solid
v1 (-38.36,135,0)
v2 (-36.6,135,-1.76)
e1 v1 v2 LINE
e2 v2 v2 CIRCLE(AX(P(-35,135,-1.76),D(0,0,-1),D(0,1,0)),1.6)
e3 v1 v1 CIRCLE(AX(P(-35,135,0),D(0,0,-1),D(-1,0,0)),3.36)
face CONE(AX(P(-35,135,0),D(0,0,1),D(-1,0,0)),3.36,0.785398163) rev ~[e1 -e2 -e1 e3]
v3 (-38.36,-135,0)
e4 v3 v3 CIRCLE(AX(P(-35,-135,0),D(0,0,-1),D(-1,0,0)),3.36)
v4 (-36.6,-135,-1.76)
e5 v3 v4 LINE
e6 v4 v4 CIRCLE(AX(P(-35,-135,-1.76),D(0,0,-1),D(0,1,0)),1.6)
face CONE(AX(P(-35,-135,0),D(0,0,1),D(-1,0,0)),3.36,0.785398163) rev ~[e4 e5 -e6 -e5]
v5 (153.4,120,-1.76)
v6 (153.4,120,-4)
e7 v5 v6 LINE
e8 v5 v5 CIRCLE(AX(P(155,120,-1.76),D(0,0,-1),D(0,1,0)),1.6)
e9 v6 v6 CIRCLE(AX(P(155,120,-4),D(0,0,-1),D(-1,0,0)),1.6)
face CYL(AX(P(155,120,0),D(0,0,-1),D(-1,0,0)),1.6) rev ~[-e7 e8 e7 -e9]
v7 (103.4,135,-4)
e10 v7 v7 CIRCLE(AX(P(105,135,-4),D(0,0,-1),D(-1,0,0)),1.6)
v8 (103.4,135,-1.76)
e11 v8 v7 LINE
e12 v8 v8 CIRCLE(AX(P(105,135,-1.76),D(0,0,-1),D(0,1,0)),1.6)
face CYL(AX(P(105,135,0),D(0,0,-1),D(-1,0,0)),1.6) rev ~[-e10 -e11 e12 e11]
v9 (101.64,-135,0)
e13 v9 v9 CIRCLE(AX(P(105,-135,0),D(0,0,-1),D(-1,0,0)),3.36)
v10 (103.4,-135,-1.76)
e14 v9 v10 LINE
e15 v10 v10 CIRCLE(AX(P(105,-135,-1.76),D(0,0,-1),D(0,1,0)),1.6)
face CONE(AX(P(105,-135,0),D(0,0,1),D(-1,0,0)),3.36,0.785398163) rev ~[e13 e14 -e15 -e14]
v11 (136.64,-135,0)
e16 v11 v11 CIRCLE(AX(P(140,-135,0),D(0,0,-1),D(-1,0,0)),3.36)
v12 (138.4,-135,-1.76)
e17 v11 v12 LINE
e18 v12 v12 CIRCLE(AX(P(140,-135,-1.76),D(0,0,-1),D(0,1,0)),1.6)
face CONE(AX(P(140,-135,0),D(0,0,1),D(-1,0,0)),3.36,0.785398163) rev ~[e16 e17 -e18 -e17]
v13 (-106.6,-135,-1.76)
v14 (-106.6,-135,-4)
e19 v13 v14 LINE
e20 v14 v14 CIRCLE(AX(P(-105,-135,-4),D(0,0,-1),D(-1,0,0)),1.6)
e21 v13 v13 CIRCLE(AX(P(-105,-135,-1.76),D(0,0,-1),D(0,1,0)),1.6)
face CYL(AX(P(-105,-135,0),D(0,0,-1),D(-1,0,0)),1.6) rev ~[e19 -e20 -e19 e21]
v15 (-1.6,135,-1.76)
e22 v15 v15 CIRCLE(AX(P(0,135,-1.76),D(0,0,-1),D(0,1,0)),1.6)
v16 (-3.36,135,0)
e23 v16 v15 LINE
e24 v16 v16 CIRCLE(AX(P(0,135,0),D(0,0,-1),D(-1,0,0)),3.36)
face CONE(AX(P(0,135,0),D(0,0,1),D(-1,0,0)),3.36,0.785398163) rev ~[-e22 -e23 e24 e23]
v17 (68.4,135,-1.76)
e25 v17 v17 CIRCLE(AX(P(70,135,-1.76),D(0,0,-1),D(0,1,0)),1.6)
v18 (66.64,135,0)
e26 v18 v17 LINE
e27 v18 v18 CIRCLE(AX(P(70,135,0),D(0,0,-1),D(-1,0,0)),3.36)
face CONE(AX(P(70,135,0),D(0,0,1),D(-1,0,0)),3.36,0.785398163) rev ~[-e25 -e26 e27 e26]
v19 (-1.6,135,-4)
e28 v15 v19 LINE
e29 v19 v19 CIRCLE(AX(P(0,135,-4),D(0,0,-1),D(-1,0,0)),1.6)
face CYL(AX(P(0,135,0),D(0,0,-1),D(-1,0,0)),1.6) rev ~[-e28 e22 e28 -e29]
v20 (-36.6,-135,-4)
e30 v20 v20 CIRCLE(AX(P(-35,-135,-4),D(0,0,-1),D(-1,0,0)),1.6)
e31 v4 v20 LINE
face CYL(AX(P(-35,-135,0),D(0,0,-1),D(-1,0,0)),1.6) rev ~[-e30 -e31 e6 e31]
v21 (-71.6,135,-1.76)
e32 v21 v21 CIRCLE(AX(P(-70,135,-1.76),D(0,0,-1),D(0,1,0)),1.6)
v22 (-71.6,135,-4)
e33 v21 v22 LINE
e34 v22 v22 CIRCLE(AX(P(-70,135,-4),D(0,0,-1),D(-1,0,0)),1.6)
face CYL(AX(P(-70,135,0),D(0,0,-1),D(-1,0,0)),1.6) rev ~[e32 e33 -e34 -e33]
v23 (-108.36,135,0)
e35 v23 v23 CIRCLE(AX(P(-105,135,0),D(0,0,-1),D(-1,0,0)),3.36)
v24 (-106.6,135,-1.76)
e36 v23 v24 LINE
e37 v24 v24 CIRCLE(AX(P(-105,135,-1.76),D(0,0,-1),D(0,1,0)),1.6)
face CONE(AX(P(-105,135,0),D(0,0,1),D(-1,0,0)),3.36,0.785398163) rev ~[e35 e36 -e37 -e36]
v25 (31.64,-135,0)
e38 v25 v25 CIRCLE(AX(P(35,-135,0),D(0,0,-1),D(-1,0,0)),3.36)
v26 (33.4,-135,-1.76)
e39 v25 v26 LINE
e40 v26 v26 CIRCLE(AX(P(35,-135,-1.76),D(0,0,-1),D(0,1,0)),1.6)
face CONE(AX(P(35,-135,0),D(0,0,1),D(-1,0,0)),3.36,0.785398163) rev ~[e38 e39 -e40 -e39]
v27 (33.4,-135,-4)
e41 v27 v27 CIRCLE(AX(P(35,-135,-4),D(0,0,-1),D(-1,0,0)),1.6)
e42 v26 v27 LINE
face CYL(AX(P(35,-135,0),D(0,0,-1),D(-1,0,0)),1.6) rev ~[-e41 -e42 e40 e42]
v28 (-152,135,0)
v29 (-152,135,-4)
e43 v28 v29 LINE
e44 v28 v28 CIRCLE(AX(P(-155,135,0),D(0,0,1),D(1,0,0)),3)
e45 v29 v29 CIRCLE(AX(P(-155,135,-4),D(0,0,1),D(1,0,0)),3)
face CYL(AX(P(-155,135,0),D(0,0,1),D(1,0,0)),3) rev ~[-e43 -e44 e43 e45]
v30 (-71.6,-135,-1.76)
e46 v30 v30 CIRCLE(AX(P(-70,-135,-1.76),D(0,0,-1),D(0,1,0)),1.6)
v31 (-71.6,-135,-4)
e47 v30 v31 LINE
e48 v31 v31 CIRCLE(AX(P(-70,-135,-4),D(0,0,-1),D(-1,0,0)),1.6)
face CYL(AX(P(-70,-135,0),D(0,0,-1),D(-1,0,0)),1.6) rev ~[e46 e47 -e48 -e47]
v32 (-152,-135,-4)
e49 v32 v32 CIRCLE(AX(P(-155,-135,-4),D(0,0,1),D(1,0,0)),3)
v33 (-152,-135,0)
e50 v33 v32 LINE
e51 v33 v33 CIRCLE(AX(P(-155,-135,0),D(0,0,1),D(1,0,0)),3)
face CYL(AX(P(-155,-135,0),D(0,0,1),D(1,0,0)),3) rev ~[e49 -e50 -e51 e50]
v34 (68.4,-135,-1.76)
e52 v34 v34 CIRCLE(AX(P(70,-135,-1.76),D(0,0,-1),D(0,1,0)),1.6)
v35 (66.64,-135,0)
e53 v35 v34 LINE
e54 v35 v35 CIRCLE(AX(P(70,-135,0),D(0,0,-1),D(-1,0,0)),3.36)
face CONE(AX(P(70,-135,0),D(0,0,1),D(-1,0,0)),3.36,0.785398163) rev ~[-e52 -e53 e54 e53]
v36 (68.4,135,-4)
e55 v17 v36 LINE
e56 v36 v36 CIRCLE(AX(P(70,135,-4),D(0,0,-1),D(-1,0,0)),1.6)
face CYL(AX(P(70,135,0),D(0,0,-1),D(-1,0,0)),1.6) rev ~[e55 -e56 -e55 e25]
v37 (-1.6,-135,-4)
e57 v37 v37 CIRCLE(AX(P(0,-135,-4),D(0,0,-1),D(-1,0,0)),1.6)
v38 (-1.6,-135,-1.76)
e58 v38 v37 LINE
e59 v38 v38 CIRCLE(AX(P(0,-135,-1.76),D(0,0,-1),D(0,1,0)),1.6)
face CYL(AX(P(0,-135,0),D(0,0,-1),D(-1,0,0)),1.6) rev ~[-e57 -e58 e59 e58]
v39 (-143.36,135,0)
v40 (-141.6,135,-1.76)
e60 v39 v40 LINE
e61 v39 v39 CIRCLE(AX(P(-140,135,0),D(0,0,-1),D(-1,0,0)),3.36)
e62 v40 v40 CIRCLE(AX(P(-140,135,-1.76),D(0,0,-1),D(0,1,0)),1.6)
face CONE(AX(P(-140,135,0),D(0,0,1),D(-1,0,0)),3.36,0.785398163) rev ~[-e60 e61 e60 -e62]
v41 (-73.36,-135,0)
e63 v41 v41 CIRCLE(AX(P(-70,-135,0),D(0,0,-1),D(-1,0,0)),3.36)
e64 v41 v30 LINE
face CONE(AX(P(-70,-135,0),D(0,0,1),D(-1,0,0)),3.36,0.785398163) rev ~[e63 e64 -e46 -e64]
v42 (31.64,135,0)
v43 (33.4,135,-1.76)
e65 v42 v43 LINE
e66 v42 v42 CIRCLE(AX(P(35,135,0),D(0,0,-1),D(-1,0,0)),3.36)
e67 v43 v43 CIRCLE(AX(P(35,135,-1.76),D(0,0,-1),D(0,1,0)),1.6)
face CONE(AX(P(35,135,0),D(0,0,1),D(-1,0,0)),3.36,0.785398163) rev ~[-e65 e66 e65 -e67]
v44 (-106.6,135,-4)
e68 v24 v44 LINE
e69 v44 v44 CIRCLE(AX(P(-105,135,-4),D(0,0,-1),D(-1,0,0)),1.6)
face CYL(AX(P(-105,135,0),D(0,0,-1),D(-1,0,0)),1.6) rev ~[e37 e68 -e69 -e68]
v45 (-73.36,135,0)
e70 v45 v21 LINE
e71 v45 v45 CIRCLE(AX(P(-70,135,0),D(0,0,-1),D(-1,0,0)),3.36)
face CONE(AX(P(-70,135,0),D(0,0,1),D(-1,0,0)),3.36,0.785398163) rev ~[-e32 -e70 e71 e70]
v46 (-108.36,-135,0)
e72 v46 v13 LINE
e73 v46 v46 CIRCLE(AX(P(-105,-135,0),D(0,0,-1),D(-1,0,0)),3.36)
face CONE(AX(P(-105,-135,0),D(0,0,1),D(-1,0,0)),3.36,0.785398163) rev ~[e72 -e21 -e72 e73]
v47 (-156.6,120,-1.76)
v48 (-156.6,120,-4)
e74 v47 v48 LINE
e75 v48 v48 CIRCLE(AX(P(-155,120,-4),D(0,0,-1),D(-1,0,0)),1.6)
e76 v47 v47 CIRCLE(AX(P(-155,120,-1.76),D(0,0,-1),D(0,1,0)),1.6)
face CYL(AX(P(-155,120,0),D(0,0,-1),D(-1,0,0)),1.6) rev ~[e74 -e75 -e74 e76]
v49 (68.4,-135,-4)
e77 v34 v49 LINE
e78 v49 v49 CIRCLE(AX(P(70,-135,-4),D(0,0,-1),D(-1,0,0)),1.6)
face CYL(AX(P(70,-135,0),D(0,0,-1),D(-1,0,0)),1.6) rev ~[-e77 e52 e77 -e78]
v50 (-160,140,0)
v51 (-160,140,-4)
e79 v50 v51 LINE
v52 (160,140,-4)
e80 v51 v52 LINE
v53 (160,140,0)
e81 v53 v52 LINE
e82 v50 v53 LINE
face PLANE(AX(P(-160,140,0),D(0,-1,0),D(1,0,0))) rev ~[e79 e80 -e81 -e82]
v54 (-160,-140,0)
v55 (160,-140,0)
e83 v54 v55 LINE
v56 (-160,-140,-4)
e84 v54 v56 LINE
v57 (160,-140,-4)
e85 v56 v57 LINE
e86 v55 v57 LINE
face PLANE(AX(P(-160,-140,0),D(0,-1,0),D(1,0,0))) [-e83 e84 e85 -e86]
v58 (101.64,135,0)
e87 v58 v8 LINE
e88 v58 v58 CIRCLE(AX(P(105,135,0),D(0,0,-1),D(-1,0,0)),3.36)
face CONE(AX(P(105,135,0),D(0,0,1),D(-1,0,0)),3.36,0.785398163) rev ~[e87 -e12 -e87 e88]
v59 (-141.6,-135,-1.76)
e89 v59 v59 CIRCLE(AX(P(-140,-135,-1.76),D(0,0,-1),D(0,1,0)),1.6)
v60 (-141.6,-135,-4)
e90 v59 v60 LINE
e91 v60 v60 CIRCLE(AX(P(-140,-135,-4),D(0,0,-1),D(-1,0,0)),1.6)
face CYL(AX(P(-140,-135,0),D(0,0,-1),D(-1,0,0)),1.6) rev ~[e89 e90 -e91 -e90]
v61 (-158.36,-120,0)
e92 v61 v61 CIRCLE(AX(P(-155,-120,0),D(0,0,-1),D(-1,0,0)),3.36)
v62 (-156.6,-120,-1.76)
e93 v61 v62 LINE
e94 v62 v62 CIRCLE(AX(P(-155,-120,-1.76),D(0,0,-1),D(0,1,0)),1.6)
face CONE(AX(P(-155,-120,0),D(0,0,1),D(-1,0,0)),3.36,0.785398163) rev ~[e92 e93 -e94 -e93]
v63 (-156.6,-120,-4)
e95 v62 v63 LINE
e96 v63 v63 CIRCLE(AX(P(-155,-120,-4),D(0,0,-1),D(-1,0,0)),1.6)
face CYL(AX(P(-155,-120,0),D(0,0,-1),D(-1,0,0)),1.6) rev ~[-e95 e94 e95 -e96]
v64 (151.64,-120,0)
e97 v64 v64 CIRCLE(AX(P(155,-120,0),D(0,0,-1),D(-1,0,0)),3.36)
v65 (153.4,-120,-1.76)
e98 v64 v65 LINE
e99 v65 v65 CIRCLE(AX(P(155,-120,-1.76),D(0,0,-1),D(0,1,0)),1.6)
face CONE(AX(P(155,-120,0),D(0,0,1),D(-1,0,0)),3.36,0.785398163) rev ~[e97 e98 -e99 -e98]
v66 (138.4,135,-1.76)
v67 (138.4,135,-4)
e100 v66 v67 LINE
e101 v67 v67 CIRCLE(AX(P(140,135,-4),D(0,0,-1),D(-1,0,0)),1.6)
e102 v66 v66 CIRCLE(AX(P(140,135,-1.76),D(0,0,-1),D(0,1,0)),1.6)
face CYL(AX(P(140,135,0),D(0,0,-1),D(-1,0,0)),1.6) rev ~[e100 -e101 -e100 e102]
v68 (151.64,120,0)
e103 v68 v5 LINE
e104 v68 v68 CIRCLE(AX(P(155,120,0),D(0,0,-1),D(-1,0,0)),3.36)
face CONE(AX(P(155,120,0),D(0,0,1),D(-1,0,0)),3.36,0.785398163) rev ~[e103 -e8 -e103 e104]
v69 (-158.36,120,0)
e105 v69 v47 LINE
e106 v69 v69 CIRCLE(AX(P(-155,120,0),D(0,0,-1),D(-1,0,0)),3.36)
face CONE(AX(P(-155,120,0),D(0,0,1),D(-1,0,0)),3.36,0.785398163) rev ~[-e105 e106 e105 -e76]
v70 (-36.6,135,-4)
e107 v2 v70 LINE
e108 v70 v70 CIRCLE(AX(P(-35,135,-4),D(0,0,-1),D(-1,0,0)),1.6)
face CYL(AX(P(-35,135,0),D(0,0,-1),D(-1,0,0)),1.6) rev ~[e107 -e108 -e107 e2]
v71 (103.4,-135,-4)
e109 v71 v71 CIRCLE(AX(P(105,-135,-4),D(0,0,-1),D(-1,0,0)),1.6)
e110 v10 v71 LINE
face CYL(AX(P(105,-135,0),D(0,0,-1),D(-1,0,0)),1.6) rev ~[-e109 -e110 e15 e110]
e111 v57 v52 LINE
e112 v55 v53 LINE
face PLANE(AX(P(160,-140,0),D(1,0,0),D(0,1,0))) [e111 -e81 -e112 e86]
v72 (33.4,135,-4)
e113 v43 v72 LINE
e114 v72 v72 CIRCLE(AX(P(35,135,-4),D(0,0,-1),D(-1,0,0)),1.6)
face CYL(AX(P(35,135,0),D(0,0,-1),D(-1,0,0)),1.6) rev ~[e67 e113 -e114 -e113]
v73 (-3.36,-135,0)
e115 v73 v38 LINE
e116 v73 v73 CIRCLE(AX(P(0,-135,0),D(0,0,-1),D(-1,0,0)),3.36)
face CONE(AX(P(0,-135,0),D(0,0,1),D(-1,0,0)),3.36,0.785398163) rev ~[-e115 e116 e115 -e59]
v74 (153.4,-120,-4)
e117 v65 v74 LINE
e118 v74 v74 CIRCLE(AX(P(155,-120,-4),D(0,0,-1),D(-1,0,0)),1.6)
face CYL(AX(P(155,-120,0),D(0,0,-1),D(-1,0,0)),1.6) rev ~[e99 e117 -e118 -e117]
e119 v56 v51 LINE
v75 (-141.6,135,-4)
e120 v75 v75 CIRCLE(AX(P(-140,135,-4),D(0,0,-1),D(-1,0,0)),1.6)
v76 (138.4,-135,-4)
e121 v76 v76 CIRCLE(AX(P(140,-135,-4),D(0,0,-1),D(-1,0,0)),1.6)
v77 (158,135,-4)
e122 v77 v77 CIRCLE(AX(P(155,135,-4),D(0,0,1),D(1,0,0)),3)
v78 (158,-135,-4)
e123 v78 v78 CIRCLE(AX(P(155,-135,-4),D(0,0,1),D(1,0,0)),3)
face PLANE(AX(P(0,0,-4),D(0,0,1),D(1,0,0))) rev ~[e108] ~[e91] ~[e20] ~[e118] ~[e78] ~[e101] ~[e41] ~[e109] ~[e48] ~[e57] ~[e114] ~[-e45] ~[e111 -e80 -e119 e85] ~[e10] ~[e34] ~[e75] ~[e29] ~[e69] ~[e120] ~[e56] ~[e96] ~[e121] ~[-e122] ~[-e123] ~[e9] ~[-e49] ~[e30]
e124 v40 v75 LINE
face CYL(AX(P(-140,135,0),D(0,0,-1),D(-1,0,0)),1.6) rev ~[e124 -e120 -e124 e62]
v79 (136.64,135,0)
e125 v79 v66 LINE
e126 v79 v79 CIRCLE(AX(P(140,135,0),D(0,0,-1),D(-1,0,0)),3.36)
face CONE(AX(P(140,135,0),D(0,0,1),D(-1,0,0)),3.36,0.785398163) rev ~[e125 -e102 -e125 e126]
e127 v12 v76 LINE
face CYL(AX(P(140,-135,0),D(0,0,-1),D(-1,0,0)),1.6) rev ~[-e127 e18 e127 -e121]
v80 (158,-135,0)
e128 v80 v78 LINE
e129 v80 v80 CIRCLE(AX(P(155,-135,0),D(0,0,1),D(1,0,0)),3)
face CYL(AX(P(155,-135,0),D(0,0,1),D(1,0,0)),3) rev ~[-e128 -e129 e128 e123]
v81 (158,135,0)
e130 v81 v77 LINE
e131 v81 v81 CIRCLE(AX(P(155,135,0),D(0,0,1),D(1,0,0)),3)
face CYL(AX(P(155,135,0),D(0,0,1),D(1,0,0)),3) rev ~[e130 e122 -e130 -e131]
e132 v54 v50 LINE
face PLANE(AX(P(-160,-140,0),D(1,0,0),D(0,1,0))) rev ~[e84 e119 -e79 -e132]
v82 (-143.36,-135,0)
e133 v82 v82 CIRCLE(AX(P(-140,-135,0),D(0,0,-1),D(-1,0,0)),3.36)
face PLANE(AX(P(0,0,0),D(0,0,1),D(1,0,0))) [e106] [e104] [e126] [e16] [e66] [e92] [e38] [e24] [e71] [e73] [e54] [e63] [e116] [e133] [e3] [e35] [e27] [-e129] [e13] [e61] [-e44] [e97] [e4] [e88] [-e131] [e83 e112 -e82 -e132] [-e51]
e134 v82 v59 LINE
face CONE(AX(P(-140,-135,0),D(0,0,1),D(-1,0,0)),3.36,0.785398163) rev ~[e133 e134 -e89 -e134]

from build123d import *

# Parameters (mm, degrees)
F0_W           = 320
F0_H           = 280
F0_R           = 3
F1_DEPTH       = 4
F2_D           = 3.2
F2_CSINK_D     = 6.72
F2_CSINK_ANGLE = 90


# Not quite as in the source:
# - a feature names something its author has since deleted; it is built from what else it names


with BuildPart() as f1:
    # F0 (on Top) → F1 (new body)
    with BuildSketch(Plane.XY):
        Rectangle(F0_W, F0_H)
        with Locations((-155, -135)):
            Circle(F0_R, mode=Mode.SUBTRACT)
        with Locations((155, -135)):
            Circle(F0_R, mode=Mode.SUBTRACT)
        with Locations((-155, 135)):
            Circle(F0_R, mode=Mode.SUBTRACT)
        with Locations((155, 135)):
            Circle(F0_R, mode=Mode.SUBTRACT)
    extrude(amount=-F1_DEPTH)

    # F2 (through all)
    with Locations(Plane.XY):
        with Locations((0, -135), (0, 135), (-105, 135), (-70, 135), (-35, 135), (35, 135), (70, 135), (105, 135), (-105, -135), (-70, -135), (-35, -135), (35, -135), (70, -135), (105, -135), (140, 135), (140, -135), (-140, 135), (-140, -135), (155, -120), (155, 120), (-155, 120), (-155, -120)):
            CounterSinkHole(F2_D / 2, F2_CSINK_D / 2, counter_sink_angle=F2_CSINK_ANGLE)


solid = f1.part
